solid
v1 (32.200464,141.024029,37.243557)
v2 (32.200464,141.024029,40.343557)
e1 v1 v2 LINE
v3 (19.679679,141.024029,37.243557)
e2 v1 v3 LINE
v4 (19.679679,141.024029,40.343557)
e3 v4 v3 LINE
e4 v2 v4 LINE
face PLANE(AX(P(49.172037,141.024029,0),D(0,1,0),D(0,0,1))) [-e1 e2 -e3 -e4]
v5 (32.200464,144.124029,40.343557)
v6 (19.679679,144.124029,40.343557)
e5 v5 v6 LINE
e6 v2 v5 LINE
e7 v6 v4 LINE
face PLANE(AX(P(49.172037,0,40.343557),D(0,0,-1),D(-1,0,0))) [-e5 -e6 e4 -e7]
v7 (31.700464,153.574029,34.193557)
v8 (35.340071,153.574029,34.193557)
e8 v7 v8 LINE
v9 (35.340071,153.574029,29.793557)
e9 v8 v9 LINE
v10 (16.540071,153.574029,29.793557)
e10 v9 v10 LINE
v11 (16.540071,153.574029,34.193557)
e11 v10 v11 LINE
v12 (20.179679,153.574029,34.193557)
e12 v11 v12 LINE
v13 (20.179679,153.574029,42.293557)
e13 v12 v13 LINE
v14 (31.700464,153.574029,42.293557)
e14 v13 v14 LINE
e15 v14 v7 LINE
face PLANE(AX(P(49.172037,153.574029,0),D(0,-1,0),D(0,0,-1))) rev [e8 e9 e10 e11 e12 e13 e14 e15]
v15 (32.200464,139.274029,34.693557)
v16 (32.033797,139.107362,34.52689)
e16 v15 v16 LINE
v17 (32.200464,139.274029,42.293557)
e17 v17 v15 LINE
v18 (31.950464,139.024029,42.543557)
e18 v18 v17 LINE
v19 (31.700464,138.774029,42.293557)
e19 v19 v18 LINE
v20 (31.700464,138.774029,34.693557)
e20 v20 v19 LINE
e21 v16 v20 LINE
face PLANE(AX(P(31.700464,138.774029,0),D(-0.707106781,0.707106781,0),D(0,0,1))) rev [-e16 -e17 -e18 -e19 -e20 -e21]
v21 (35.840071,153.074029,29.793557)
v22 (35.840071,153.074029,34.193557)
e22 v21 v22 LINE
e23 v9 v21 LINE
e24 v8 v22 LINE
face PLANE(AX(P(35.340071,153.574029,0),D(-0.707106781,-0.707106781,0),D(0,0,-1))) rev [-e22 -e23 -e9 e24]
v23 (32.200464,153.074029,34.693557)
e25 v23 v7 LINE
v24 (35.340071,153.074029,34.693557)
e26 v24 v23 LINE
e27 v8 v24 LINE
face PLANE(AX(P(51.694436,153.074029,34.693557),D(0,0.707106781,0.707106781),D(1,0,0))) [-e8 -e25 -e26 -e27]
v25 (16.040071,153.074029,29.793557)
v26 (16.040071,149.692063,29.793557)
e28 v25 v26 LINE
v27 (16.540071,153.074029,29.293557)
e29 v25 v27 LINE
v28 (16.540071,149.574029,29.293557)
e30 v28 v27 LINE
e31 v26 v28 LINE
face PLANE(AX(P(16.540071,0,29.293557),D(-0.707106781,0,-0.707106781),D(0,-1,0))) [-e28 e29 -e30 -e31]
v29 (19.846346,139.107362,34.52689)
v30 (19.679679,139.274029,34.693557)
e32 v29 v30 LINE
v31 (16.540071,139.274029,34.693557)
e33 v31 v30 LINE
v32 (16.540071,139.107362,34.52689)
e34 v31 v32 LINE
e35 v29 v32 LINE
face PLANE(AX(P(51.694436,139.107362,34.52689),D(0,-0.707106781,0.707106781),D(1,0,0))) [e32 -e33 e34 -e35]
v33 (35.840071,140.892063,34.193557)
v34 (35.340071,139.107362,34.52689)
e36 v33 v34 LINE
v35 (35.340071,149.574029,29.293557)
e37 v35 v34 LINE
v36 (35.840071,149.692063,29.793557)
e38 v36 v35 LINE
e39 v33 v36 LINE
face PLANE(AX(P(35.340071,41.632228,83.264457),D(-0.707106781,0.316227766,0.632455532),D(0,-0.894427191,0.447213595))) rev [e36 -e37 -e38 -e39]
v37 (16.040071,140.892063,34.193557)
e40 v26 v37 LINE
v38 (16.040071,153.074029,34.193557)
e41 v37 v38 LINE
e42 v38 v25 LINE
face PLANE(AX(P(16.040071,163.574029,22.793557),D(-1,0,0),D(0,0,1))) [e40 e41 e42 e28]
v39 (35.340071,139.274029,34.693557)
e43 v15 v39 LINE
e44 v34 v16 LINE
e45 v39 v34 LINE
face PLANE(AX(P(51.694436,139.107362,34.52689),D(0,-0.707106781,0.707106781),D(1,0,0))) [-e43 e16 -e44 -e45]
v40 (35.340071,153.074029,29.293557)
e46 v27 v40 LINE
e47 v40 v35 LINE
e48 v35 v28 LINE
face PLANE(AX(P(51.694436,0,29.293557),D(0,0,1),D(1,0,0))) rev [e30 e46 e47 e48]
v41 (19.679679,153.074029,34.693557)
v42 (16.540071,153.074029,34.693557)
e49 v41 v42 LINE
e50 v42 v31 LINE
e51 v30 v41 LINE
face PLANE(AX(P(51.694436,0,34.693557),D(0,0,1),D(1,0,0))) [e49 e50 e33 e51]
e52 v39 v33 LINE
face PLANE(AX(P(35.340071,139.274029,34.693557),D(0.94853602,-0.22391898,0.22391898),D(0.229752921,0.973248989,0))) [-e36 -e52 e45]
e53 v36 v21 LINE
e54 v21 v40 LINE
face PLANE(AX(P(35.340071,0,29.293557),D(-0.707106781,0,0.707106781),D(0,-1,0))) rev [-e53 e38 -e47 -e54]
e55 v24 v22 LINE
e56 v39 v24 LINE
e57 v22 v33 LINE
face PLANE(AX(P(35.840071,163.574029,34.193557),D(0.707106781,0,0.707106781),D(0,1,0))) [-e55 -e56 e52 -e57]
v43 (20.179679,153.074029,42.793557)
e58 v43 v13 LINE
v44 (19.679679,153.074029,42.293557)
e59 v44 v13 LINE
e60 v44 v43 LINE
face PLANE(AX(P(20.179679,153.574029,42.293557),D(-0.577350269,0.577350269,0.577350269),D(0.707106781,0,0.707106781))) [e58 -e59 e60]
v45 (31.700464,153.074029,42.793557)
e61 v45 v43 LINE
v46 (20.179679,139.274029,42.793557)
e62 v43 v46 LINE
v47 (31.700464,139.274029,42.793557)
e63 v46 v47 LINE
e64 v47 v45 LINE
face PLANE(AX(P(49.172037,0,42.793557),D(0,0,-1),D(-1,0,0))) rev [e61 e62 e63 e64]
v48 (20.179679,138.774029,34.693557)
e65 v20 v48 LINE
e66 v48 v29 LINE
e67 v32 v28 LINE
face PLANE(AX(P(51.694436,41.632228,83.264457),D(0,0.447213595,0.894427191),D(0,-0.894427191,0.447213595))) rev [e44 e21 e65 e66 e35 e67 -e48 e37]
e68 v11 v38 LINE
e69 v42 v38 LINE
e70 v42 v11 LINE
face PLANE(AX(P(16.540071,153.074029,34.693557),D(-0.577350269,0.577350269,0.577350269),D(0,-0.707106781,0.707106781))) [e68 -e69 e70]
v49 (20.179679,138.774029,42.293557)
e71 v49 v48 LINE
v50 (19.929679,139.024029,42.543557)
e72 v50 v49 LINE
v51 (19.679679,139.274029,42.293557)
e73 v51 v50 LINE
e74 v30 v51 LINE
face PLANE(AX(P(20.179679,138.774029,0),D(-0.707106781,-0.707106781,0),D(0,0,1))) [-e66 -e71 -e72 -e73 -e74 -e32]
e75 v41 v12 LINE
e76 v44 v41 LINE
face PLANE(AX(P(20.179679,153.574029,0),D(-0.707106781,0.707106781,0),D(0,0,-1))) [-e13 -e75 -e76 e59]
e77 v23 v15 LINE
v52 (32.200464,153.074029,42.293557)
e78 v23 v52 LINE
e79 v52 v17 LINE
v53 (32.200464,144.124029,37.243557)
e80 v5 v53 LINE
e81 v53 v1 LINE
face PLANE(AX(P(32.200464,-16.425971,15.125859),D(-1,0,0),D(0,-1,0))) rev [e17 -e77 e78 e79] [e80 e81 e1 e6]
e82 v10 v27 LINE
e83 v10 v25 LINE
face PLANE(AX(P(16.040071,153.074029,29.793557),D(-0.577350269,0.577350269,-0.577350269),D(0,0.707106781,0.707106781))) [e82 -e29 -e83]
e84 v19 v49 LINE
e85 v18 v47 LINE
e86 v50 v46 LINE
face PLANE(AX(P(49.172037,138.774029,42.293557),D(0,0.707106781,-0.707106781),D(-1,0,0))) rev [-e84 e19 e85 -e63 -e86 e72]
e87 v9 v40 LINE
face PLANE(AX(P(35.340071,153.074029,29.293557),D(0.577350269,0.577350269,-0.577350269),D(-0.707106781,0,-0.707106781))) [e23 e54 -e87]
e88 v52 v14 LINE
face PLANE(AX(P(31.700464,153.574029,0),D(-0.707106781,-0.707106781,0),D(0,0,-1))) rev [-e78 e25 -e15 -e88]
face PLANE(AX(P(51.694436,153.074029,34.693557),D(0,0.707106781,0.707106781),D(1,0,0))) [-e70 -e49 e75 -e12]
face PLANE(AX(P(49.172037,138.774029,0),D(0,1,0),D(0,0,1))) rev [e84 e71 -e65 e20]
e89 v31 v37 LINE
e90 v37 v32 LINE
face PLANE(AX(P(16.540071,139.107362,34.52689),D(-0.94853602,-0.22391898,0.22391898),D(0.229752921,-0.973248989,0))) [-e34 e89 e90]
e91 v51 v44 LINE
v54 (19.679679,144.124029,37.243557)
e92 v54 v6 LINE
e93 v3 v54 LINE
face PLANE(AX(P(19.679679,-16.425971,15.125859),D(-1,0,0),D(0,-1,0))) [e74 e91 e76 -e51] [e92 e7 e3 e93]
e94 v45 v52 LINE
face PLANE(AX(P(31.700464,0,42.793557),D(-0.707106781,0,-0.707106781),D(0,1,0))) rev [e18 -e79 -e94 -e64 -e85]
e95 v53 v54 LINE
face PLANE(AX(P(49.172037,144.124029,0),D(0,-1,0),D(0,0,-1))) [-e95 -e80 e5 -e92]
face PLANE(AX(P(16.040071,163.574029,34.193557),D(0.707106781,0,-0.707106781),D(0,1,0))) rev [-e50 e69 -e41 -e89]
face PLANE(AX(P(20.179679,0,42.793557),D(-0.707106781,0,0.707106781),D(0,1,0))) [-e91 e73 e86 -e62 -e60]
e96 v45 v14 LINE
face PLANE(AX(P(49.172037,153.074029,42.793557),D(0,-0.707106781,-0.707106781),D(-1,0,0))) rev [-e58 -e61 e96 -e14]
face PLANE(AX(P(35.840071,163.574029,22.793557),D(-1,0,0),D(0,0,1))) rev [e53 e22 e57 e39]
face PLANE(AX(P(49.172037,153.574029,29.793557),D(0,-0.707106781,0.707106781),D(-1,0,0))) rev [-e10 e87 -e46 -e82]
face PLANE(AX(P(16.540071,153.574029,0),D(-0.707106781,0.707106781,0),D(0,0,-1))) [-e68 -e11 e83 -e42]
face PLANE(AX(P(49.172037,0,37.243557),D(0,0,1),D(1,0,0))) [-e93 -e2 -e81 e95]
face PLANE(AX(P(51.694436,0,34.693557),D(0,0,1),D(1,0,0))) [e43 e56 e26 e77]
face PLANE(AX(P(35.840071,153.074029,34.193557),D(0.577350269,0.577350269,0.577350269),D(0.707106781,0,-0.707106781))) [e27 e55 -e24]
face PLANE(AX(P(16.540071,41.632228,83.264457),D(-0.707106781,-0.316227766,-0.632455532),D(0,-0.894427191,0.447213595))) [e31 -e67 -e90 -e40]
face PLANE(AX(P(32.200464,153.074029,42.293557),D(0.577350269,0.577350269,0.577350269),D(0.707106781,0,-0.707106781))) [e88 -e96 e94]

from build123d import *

# Parameters (mm, degrees)
BOSS_EXTRUDE1_DEPTH      = 6.260392
BOSS_EXTRUDE1_DEPTH_BACK = 6.260392
SKETCH4_W                = 8.1
SKETCH4_H                = 14.8
SKETCH4_W_2              = 3.1
SKETCH4_H_2              = 3.1
BOSS_EXTRUDE2_DEPTH      = 9.9
BOSS_EXTRUDE2_DEPTH_BACK = 9.9
CHAMFER2_SIZE            = 0.5


with BuildPart() as part:
    # Sketch4 → Boss-Extrude1 (new, two sides: drawn at the far end of the back side and taken through both)
    with BuildSketch(Plane(origin=(25.940071358, 0, 0), x_dir=(0, 0, -1), z_dir=(1, 0, 0)).offset(-BOSS_EXTRUDE1_DEPTH_BACK)):
        with Locations((-38.743556796, 146.174028513)):
            Rectangle(SKETCH4_W, SKETCH4_H)
        with Locations((-38.793556796, 142.574028513)):
            Rectangle(SKETCH4_W_2, SKETCH4_H_2, mode=Mode.SUBTRACT)
    extrude(amount=BOSS_EXTRUDE1_DEPTH + BOSS_EXTRUDE1_DEPTH_BACK)

    # Sketch4<5> → Boss-Extrude2 (add, two sides: drawn at the far end of the back side and taken through both)
    with BuildSketch(Plane(origin=(25.940071358, 0, 0), x_dir=(0, 0, -1), z_dir=(1, 0, 0)).offset(-BOSS_EXTRUDE2_DEPTH_BACK)):
        Polygon((-34.693556796, 153.574028513), (-34.693556796, 138.774028513), (-29.293556796, 149.574028513), (-29.293556796, 153.574028513), align=None)
    extrude(amount=BOSS_EXTRUDE2_DEPTH + BOSS_EXTRUDE2_DEPTH_BACK)

    # Chamfer1
    # the kernel refuses this chamfer: 0.5, 0.372677996 mm, written as the material it takes off along each edge
    with BuildSketch(Plane(origin=(20.013012691, 153.240695179, 42.460223463), x_dir=(0, 0.7071067811865475, -0.7071067811865475), z_dir=(-0.5773502691896258, 0.5773502691896258, 0.5773502691896258)), Plane(origin=(35.506738024, 153.240695179, 29.62689013), x_dir=(0.7071067811865475, -0.7071067811865475, 0), z_dir=(0.5773502691896258, 0.5773502691896258, -0.5773502691896258)), Plane(origin=(16.373404691, 153.240695179, 29.62689013), x_dir=(0, -0.7071067811865475, -0.7071067811865475), z_dir=(-0.5773502691896258, 0.5773502691896258, -0.5773502691896258))) as chamfer1_piece_1:
        Polygon((-0.353553391, -0.204124145), (0.353553391, -0.204124145), (0, 0.40824829), align=None)
    extrude(amount=0.635085296, mode=Mode.SUBTRACT)
    with BuildSketch(Plane(origin=(31.867130024, 153.240695179, 42.460223463), x_dir=(0, 0.7071067811865475, -0.7071067811865475), z_dir=(0.5773502691896258, 0.5773502691896258, 0.5773502691896258)), Plane(origin=(35.506738024, 153.240695179, 34.360223463), x_dir=(0, 0.7071067811865475, -0.7071067811865475), z_dir=(0.5773502691896258, 0.5773502691896258, 0.5773502691896258)), Plane(origin=(16.373404691, 153.240695179, 34.360223463), x_dir=(0, -0.7071067811865475, 0.7071067811865475), z_dir=(-0.5773502691896258, 0.5773502691896258, 0.5773502691896258))) as chamfer1_piece_2:
        Polygon((-0.353553391, 0.204124145), (0.353553391, 0.204124145), (0, -0.40824829), align=None)
    extrude(amount=0.635085296, mode=Mode.SUBTRACT)
    with BuildSketch(Plane(origin=(35.506738024, 139.75781762, 34.471334574), x_dir=(0, -0.7071067811865777, -0.7071067811865174), z_dir=(0.9485360198619486, -0.223918979794528, 0.22391897979454709))) as chamfer1_piece_3:
        Polygon((0.184955718, -0.526311482), (0.420657979, -0.526311482), (-0.605613697, 1.052622965), align=None)
    extrude(amount=0.64485025, mode=Mode.SUBTRACT)
    with BuildSketch(Plane(origin=(16.373404691, 139.75781762, 34.471334574), x_dir=(0, 0.7071067811865777, 0.7071067811865174), z_dir=(-0.9485360198619486, -0.223918979794528, 0.22391897979454709))) as chamfer1_piece_4:
        Polygon((-0.420657979, -0.526311482), (-0.184955718, -0.526311482), (0.605613697, 1.052622965), align=None)
    extrude(amount=0.64485025, mode=Mode.SUBTRACT)
    with BuildSketch(Plane(origin=(18.393837864, 138.774028513, 42.793556796), x_dir=(0, 0.999621916911297, 0.027495876610582292), z_dir=(1, 0, 0)), Plane(origin=(18.393837864, 153.574028513, 42.793556796), x_dir=(0, 0.02749587661058229, -0.9996219169112968), z_dir=(1, 0, 0))) as chamfer1_piece_5:
        with BuildLine():
            Line((0.514336598, 0), (-0.028273577, -0.513558897))
            Line((-0.028273577, -0.513558897), (-0.038269797, -0.513283938))
            ThreePointArc((-0.038269797, -0.513283938), (-0.017064614, -0.256698915), (-0.009996219, 0.000274959))
            Line((-0.009996219, 0.000274959), (0.000274959, 0.009996219))
            ThreePointArc((0.000274959, 0.009996219), (0.257248832, 0.002927825), (0.514611556, 0.009996219))
            Line((0.514611556, 0.009996219), (0.514336598, 0))
        make_face()
    extrude(amount=15.092466988, mode=Mode.SUBTRACT)
    with BuildSketch(Plane(origin=(32.200463358, 154.859870007, 42.793556796), x_dir=(0.02749587661058229, 0, -0.9996219169112968), z_dir=(0, -1, 0)), Plane(origin=(19.679679358, 154.859870007, 42.793556796), x_dir=(0.999621916911297, 0, 0.027495876610582105), z_dir=(0, -1, 0)), Plane(origin=(16.040071358, 154.859870007, 34.693556796), x_dir=(0.999621916911297, 0, 0.027495876610582105), z_dir=(0, -1, 0))) as chamfer1_piece_6:
        with BuildLine():
            Line((0.514336598, 0), (-0.028273577, -0.513558897))
            Line((-0.028273577, -0.513558897), (-0.038269797, -0.513283938))
            ThreePointArc((-0.038269797, -0.513283938), (-0.017064614, -0.256698915), (-0.009996219, 0.000274959))
            Line((-0.009996219, 0.000274959), (0.000274959, 0.009996219))
            ThreePointArc((0.000274959, 0.009996219), (0.257248832, 0.002927825), (0.514611556, 0.009996219))
            Line((0.514611556, 0.009996219), (0.514336598, 0))
        make_face()
    extrude(amount=17.371682988, mode=Mode.SUBTRACT)
    with BuildSketch(Plane(origin=(32.200463358, 153.574028513, 34.693556796), x_dir=(-0.999621916911297, 0.027495876610582105, 0), z_dir=(0, 0, 1))) as chamfer1_piece_7:
        with BuildLine():
            Line((0.514336598, 0), (-0.028273577, 0.513558897))
            Line((-0.028273577, 0.513558897), (-0.038269797, 0.513283938))
            ThreePointArc((-0.038269797, 0.513283938), (-0.017064614, 0.256698915), (-0.009996219, -0.000274959))
            Line((-0.009996219, -0.000274959), (0.000274959, -0.009996219))
            ThreePointArc((0.000274959, -0.009996219), (0.257248832, -0.002927825), (0.514611556, -0.009996219))
            Line((0.514611556, -0.009996219), (0.514336598, 0))
        make_face()
    extrude(amount=9.385841494, mode=Mode.SUBTRACT)
    with BuildSketch(Plane(origin=(19.679679358, 153.574028513, 34.693556796), x_dir=(0.999621916911297, 0.027495876610582105, 0), z_dir=(0, 0, 1))) as chamfer1_piece_8:
        with BuildLine():
            Line((0.514336598, 0), (-0.028273577, -0.513558897))
            Line((-0.028273577, -0.513558897), (-0.038269797, -0.513283938))
            ThreePointArc((-0.038269797, -0.513283938), (-0.017064614, -0.256698915), (-0.009996219, 0.000274959))
            Line((-0.009996219, 0.000274959), (0.000274959, 0.009996219))
            ThreePointArc((0.000274959, 0.009996219), (0.257248832, 0.002927825), (0.514611556, 0.009996219))
            Line((0.514611556, 0.009996219), (0.514336598, 0))
        make_face()
    extrude(amount=9.385841494, mode=Mode.SUBTRACT)
    with BuildSketch(Plane(origin=(37.125912852, 153.574028513, 34.693556796), x_dir=(0, -0.999621916911297, 0.027495876610582292), z_dir=(-1, 0, 0))) as chamfer1_piece_9:
        with BuildLine():
            Line((0.514336598, 0), (-0.028273577, -0.513558897))
            Line((-0.028273577, -0.513558897), (-0.038269797, -0.513283938))
            ThreePointArc((-0.038269797, -0.513283938), (-0.017064614, -0.256698915), (-0.009996219, 0.000274959))
            Line((-0.009996219, 0.000274959), (0.000274959, 0.009996219))
            ThreePointArc((0.000274959, 0.009996219), (0.257248832, 0.002927825), (0.514611556, 0.009996219))
            Line((0.514611556, 0.009996219), (0.514336598, 0))
        make_face()
    extrude(amount=4.925449494, mode=Mode.SUBTRACT)
    with BuildSketch(Plane(origin=(35.840071358, 153.574028513, 28.007715302), x_dir=(-0.999621916911297, 0.027495876610582292, 0), z_dir=(0, 0, 1))) as chamfer1_piece_10:
        with BuildLine():
            Line((0.514336598, 0), (-0.028273577, 0.513558897))
            Line((-0.028273577, 0.513558897), (-0.038269797, 0.513283938))
            ThreePointArc((-0.038269797, 0.513283938), (-0.017064614, 0.256698915), (-0.009996219, -0.000274959))
            Line((-0.009996219, -0.000274959), (0.000274959, -0.009996219))
            ThreePointArc((0.000274959, -0.009996219), (0.257248832, -0.002927825), (0.514611556, -0.009996219))
            Line((0.514611556, -0.009996219), (0.514336598, 0))
        make_face()
    extrude(amount=7.971682988, mode=Mode.SUBTRACT)
    with BuildSketch(Plane(origin=(37.125912852, 153.574028513, 29.293556796), x_dir=(0, 0.027495876610582105, 0.999621916911297), z_dir=(-1, 0, 0))) as chamfer1_piece_11:
        with BuildLine():
            Line((0.514336598, 0), (-0.028273577, -0.513558897))
            Line((-0.028273577, -0.513558897), (-0.038269797, -0.513283938))
            ThreePointArc((-0.038269797, -0.513283938), (-0.017064614, -0.256698915), (-0.009996219, 0.000274959))
            Line((-0.009996219, 0.000274959), (0.000274959, 0.009996219))
            ThreePointArc((0.000274959, 0.009996219), (0.257248832, 0.002927825), (0.514611556, 0.009996219))
            Line((0.514611556, 0.009996219), (0.514336598, 0))
        make_face()
    extrude(amount=22.371682988, mode=Mode.SUBTRACT)
    with BuildSketch(Plane(origin=(16.040071358, 153.574028513, 28.007715302), x_dir=(0.999621916911297, 0.027495876610582105, 0), z_dir=(0, 0, 1))) as chamfer1_piece_12:
        with BuildLine():
            Line((0.514336598, 0), (-0.028273577, -0.513558897))
            Line((-0.028273577, -0.513558897), (-0.038269797, -0.513283938))
            ThreePointArc((-0.038269797, -0.513283938), (-0.017064614, -0.256698915), (-0.009996219, 0.000274959))
            Line((-0.009996219, 0.000274959), (0.000274959, 0.009996219))
            ThreePointArc((0.000274959, 0.009996219), (0.257248832, 0.002927825), (0.514611556, 0.009996219))
            Line((0.514611556, 0.009996219), (0.514336598, 0))
        make_face()
    extrude(amount=7.971682988, mode=Mode.SUBTRACT)
    with BuildSketch(Plane(origin=(35.840071358, 148.288187019, 29.293556796), x_dir=(0.027495876610582105, 0, 0.999621916911297), z_dir=(0, 1, 0)), Plane(origin=(16.040071358, 148.288187019, 29.293556796), x_dir=(0.9996219169112968, 0, -0.027495876610589005), z_dir=(0, 1, 0))) as chamfer1_piece_13:
        with BuildLine():
            Line((0.514336598, 0), (-0.028273577, -0.513558897))
            Line((-0.028273577, -0.513558897), (-0.038269797, -0.513283938))
            ThreePointArc((-0.038269797, -0.513283938), (-0.017064614, -0.256698915), (-0.009996219, 0.000274959))
            Line((-0.009996219, 0.000274959), (0.000274959, 0.009996219))
            ThreePointArc((0.000274959, 0.009996219), (0.257248832, 0.002927825), (0.514611556, 0.009996219))
            Line((0.514611556, 0.009996219), (0.514336598, 0))
        make_face()
    extrude(amount=6.571682988, mode=Mode.SUBTRACT)
    with BuildSketch(Plane(origin=(35.840071358, 137.623936917, 35.268602594), x_dir=(-0.999621916911297, -0.012296529840442863, -0.024593059680883298), z_dir=(0, 0.8944271909998982, -0.44721359549999323))) as chamfer1_piece_14:
        with BuildLine():
            Line((0.514336598, 0), (-0.028273577, 0.513558897))
            Line((-0.028273577, 0.513558897), (-0.038269797, 0.513283938))
            ThreePointArc((-0.038269797, 0.513283938), (-0.017064614, 0.256698915), (-0.009996219, -0.000274959))
            Line((-0.009996219, -0.000274959), (0.000274959, -0.009996219))
            ThreePointArc((0.000274959, -0.009996219), (0.257248832, -0.002927825), (0.514611556, -0.009996219))
            Line((0.514611556, -0.009996219), (0.514336598, 0))
        make_face()
    extrude(amount=14.646450066, mode=Mode.SUBTRACT)
    with BuildSketch(Plane(origin=(16.040071358, 137.623936917, 35.268602594), x_dir=(0.999621916911297, -0.012296529840442778, -0.024593059680883128), z_dir=(0, 0.8944271909998982, -0.44721359549999323))) as chamfer1_piece_15:
        with BuildLine():
            Line((0.514336598, 0), (-0.028273577, -0.513558897))
            Line((-0.028273577, -0.513558897), (-0.038269797, -0.513283938))
            ThreePointArc((-0.038269797, -0.513283938), (-0.017064614, -0.256698915), (-0.009996219, 0.000274959))
            Line((-0.009996219, 0.000274959), (0.000274959, 0.009996219))
            ThreePointArc((0.000274959, 0.009996219), (0.257248832, 0.002927825), (0.514611556, 0.009996219))
            Line((0.514611556, 0.009996219), (0.514336598, 0))
        make_face()
    extrude(amount=14.646450066, mode=Mode.SUBTRACT)
    with BuildSketch(Plane(origin=(19.679679358, 153.574028513, 34.693556796), x_dir=(0, 0.02749587661058229, -0.9996219169112968), z_dir=(-1, 0, 0))) as chamfer1_piece_16:
        with BuildLine():
            Line((0.514336598, 0), (-0.028273577, 0.513558897))
            Line((-0.028273577, 0.513558897), (-0.038269797, 0.513283938))
            ThreePointArc((-0.038269797, 0.513283938), (-0.017064614, 0.256698915), (-0.009996219, -0.000274959))
            Line((-0.009996219, -0.000274959), (0.000274959, -0.009996219))
            ThreePointArc((0.000274959, -0.009996219), (0.257248832, -0.002927825), (0.514611556, -0.009996219))
            Line((0.514611556, -0.009996219), (0.514336598, 0))
        make_face()
    extrude(amount=4.925449494, mode=Mode.SUBTRACT)
    with BuildSketch(Plane(origin=(35.840071358, 154.859870007, 34.693556796), x_dir=(-0.999621916911297, 0, 0.027495876610582292), z_dir=(0, -1, 0))) as chamfer1_piece_17:
        with BuildLine():
            Line((0.514336598, 0), (-0.028273577, 0.513558897))
            Line((-0.028273577, 0.513558897), (-0.038269797, 0.513283938))
            ThreePointArc((-0.038269797, 0.513283938), (-0.017064614, 0.256698915), (-0.009996219, -0.000274959))
            Line((-0.009996219, -0.000274959), (0.000274959, -0.009996219))
            ThreePointArc((0.000274959, -0.009996219), (0.257248832, -0.002927825), (0.514611556, -0.009996219))
            Line((0.514611556, -0.009996219), (0.514336598, 0))
        make_face()
    extrude(amount=17.371682988, mode=Mode.SUBTRACT)
    with BuildSketch(Plane(origin=(32.200463358, 138.774028513, 34.693556796), x_dir=(0, 0.999621916911297, 0.027495876610582292), z_dir=(1, 0, 0))) as chamfer1_piece_18:
        with BuildLine():
            Line((0.514336598, 0), (0.31409902, -0.189516883))
            Line((0.31409902, -0.189516883), (0.309382645, -0.198334808))
            ThreePointArc((0.309382645, -0.198334808), (0.156807481, -0.095210948), (-0.004716376, -0.008817925))
            Line((-0.004716376, -0.008817925), (0.000274959, 0.009996219))
            ThreePointArc((0.000274959, 0.009996219), (0.257248832, 0.002927825), (0.514611556, 0.009996219))
            Line((0.514611556, 0.009996219), (0.514336598, 0))
        make_face()
    extrude(amount=4.925449494, mode=Mode.SUBTRACT)
    with BuildSketch(Plane(origin=(14.754229864, 138.774028513, 34.693556796), x_dir=(0, 0.8700995906888151, -0.492875950197569), z_dir=(1, 0, 0))) as chamfer1_piece_19:
        with BuildLine():
            Line((0.366844441, 0), (0.440384543, 0.26571336))
            Line((0.440384543, 0.26571336), (0.435455784, 0.274414356))
            ThreePointArc((0.435455784, 0.274414356), (0.218748671, 0.135405143), (-0.00492876, 0.008700996))
            Line((-0.00492876, 0.008700996), (0.000517213, -0.009986616))
            ThreePointArc((0.000517213, -0.009986616), (0.183448762, -0.00051248), (0.367361654, -0.009986616))
            Line((0.367361654, -0.009986616), (0.366844441, 0))
        make_face()
    extrude(amount=4.925449494, mode=Mode.SUBTRACT)
    with BuildSketch(Plane(origin=(37.125912852, 153.574028513, 34.693556796), x_dir=(0, -0.999621916911297, 0.027495876610582292), z_dir=(-1, 0, 0))) as chamfer1_piece_20a_section:
        with BuildLine():
            Line((0.514336598, 0), (-0.028273577, -0.513558897))
            Line((-0.028273577, -0.513558897), (-0.038269797, -0.513283938))
            ThreePointArc((-0.038269797, -0.513283938), (-0.017064614, -0.256698915), (-0.009996219, 0.000274959))
            Line((-0.009996219, 0.000274959), (0.000274959, 0.009996219))
            ThreePointArc((0.000274959, 0.009996219), (0.257248832, 0.002927825), (0.514611556, 0.009996219))
            Line((0.514611556, 0.009996219), (0.514336598, 0))
        make_face()
    chamfer1_piece_20a = extrude(amount=6.211290988, mode=Mode.PRIVATE)
    chamfer1_piece_20a = split(chamfer1_piece_20a, bisect_by=Plane(origin=(32.200463358, 153.409131699, 34.528659983), z_dir=(-1, 0, 0)), keep=Keep.TOP, mode=Mode.PRIVATE)
    with BuildSketch(Plane(origin=(32.200463358, 153.574028513, 33.407715302), x_dir=(-0.999621916911297, 0.027495876610582105, 0), z_dir=(0, 0, 1))) as chamfer1_piece_20b_section:
        with BuildLine():
            Line((0.514336598, 0), (-0.028273577, 0.513558897))
            Line((-0.028273577, 0.513558897), (-0.038269797, 0.513283938))
            ThreePointArc((-0.038269797, 0.513283938), (-0.017064614, 0.256698915), (-0.009996219, -0.000274959))
            Line((-0.009996219, -0.000274959), (0.000274959, -0.009996219))
            ThreePointArc((0.000274959, -0.009996219), (0.257248832, -0.002927825), (0.514611556, -0.009996219))
            Line((0.514611556, -0.009996219), (0.514336598, 0))
        make_face()
    chamfer1_piece_20b = extrude(amount=10.671682988, mode=Mode.PRIVATE)
    chamfer1_piece_20b = split(chamfer1_piece_20b, bisect_by=Plane(origin=(32.035566544, 153.409131699, 34.693556796), z_dir=(0, 0, -1)), keep=Keep.TOP, mode=Mode.PRIVATE)
    chamfer1_piece_20 = chamfer1_piece_20a & chamfer1_piece_20b
    add(chamfer1_piece_20, mode=Mode.SUBTRACT)
    with BuildSketch(Plane(origin=(19.679679358, 153.574028513, 33.407715302), x_dir=(0.999621916911297, 0.027495876610582105, 0), z_dir=(0, 0, 1))) as chamfer1_piece_21a_section:
        with BuildLine():
            Line((0.514336598, 0), (-0.028273577, -0.513558897))
            Line((-0.028273577, -0.513558897), (-0.038269797, -0.513283938))
            ThreePointArc((-0.038269797, -0.513283938), (-0.017064614, -0.256698915), (-0.009996219, 0.000274959))
            Line((-0.009996219, 0.000274959), (0.000274959, 0.009996219))
            ThreePointArc((0.000274959, 0.009996219), (0.257248832, 0.002927825), (0.514611556, 0.009996219))
            Line((0.514611556, 0.009996219), (0.514336598, 0))
        make_face()
    chamfer1_piece_21a = extrude(amount=10.671682988, mode=Mode.PRIVATE)
    chamfer1_piece_21a = split(chamfer1_piece_21a, bisect_by=Plane(origin=(19.844576171, 153.409131699, 34.693556796), z_dir=(0, 0, -1)), keep=Keep.TOP, mode=Mode.PRIVATE)
    with BuildSketch(Plane(origin=(20.965520852, 153.574028513, 34.693556796), x_dir=(0, 0.02749587661058229, -0.9996219169112968), z_dir=(-1, 0, 0))) as chamfer1_piece_21b_section:
        with BuildLine():
            Line((0.514336598, 0), (-0.028273577, 0.513558897))
            Line((-0.028273577, 0.513558897), (-0.038269797, 0.513283938))
            ThreePointArc((-0.038269797, 0.513283938), (-0.017064614, 0.256698915), (-0.009996219, -0.000274959))
            Line((-0.009996219, -0.000274959), (0.000274959, -0.009996219))
            ThreePointArc((0.000274959, -0.009996219), (0.257248832, -0.002927825), (0.514611556, -0.009996219))
            Line((0.514611556, -0.009996219), (0.514336598, 0))
        make_face()
    chamfer1_piece_21b = extrude(amount=6.211290988, mode=Mode.PRIVATE)
    chamfer1_piece_21b = split(chamfer1_piece_21b, bisect_by=Plane(origin=(19.679679358, 153.409131699, 34.528659983), z_dir=(1, 0, 0)), keep=Keep.TOP, mode=Mode.PRIVATE)
    chamfer1_piece_21 = chamfer1_piece_21a & chamfer1_piece_21b
    add(chamfer1_piece_21, mode=Mode.SUBTRACT)

    # Chamfer2
    chamfer2_edges = [part.edges().sort_by_distance(p)[0] for p in [
        (32.200463358, 138.774028513, 38.493556796),
        (19.679679358, 138.774028513, 38.493556796),
    ]]
    chamfer(chamfer2_edges, length=CHAMFER2_SIZE)


solid = part.part
